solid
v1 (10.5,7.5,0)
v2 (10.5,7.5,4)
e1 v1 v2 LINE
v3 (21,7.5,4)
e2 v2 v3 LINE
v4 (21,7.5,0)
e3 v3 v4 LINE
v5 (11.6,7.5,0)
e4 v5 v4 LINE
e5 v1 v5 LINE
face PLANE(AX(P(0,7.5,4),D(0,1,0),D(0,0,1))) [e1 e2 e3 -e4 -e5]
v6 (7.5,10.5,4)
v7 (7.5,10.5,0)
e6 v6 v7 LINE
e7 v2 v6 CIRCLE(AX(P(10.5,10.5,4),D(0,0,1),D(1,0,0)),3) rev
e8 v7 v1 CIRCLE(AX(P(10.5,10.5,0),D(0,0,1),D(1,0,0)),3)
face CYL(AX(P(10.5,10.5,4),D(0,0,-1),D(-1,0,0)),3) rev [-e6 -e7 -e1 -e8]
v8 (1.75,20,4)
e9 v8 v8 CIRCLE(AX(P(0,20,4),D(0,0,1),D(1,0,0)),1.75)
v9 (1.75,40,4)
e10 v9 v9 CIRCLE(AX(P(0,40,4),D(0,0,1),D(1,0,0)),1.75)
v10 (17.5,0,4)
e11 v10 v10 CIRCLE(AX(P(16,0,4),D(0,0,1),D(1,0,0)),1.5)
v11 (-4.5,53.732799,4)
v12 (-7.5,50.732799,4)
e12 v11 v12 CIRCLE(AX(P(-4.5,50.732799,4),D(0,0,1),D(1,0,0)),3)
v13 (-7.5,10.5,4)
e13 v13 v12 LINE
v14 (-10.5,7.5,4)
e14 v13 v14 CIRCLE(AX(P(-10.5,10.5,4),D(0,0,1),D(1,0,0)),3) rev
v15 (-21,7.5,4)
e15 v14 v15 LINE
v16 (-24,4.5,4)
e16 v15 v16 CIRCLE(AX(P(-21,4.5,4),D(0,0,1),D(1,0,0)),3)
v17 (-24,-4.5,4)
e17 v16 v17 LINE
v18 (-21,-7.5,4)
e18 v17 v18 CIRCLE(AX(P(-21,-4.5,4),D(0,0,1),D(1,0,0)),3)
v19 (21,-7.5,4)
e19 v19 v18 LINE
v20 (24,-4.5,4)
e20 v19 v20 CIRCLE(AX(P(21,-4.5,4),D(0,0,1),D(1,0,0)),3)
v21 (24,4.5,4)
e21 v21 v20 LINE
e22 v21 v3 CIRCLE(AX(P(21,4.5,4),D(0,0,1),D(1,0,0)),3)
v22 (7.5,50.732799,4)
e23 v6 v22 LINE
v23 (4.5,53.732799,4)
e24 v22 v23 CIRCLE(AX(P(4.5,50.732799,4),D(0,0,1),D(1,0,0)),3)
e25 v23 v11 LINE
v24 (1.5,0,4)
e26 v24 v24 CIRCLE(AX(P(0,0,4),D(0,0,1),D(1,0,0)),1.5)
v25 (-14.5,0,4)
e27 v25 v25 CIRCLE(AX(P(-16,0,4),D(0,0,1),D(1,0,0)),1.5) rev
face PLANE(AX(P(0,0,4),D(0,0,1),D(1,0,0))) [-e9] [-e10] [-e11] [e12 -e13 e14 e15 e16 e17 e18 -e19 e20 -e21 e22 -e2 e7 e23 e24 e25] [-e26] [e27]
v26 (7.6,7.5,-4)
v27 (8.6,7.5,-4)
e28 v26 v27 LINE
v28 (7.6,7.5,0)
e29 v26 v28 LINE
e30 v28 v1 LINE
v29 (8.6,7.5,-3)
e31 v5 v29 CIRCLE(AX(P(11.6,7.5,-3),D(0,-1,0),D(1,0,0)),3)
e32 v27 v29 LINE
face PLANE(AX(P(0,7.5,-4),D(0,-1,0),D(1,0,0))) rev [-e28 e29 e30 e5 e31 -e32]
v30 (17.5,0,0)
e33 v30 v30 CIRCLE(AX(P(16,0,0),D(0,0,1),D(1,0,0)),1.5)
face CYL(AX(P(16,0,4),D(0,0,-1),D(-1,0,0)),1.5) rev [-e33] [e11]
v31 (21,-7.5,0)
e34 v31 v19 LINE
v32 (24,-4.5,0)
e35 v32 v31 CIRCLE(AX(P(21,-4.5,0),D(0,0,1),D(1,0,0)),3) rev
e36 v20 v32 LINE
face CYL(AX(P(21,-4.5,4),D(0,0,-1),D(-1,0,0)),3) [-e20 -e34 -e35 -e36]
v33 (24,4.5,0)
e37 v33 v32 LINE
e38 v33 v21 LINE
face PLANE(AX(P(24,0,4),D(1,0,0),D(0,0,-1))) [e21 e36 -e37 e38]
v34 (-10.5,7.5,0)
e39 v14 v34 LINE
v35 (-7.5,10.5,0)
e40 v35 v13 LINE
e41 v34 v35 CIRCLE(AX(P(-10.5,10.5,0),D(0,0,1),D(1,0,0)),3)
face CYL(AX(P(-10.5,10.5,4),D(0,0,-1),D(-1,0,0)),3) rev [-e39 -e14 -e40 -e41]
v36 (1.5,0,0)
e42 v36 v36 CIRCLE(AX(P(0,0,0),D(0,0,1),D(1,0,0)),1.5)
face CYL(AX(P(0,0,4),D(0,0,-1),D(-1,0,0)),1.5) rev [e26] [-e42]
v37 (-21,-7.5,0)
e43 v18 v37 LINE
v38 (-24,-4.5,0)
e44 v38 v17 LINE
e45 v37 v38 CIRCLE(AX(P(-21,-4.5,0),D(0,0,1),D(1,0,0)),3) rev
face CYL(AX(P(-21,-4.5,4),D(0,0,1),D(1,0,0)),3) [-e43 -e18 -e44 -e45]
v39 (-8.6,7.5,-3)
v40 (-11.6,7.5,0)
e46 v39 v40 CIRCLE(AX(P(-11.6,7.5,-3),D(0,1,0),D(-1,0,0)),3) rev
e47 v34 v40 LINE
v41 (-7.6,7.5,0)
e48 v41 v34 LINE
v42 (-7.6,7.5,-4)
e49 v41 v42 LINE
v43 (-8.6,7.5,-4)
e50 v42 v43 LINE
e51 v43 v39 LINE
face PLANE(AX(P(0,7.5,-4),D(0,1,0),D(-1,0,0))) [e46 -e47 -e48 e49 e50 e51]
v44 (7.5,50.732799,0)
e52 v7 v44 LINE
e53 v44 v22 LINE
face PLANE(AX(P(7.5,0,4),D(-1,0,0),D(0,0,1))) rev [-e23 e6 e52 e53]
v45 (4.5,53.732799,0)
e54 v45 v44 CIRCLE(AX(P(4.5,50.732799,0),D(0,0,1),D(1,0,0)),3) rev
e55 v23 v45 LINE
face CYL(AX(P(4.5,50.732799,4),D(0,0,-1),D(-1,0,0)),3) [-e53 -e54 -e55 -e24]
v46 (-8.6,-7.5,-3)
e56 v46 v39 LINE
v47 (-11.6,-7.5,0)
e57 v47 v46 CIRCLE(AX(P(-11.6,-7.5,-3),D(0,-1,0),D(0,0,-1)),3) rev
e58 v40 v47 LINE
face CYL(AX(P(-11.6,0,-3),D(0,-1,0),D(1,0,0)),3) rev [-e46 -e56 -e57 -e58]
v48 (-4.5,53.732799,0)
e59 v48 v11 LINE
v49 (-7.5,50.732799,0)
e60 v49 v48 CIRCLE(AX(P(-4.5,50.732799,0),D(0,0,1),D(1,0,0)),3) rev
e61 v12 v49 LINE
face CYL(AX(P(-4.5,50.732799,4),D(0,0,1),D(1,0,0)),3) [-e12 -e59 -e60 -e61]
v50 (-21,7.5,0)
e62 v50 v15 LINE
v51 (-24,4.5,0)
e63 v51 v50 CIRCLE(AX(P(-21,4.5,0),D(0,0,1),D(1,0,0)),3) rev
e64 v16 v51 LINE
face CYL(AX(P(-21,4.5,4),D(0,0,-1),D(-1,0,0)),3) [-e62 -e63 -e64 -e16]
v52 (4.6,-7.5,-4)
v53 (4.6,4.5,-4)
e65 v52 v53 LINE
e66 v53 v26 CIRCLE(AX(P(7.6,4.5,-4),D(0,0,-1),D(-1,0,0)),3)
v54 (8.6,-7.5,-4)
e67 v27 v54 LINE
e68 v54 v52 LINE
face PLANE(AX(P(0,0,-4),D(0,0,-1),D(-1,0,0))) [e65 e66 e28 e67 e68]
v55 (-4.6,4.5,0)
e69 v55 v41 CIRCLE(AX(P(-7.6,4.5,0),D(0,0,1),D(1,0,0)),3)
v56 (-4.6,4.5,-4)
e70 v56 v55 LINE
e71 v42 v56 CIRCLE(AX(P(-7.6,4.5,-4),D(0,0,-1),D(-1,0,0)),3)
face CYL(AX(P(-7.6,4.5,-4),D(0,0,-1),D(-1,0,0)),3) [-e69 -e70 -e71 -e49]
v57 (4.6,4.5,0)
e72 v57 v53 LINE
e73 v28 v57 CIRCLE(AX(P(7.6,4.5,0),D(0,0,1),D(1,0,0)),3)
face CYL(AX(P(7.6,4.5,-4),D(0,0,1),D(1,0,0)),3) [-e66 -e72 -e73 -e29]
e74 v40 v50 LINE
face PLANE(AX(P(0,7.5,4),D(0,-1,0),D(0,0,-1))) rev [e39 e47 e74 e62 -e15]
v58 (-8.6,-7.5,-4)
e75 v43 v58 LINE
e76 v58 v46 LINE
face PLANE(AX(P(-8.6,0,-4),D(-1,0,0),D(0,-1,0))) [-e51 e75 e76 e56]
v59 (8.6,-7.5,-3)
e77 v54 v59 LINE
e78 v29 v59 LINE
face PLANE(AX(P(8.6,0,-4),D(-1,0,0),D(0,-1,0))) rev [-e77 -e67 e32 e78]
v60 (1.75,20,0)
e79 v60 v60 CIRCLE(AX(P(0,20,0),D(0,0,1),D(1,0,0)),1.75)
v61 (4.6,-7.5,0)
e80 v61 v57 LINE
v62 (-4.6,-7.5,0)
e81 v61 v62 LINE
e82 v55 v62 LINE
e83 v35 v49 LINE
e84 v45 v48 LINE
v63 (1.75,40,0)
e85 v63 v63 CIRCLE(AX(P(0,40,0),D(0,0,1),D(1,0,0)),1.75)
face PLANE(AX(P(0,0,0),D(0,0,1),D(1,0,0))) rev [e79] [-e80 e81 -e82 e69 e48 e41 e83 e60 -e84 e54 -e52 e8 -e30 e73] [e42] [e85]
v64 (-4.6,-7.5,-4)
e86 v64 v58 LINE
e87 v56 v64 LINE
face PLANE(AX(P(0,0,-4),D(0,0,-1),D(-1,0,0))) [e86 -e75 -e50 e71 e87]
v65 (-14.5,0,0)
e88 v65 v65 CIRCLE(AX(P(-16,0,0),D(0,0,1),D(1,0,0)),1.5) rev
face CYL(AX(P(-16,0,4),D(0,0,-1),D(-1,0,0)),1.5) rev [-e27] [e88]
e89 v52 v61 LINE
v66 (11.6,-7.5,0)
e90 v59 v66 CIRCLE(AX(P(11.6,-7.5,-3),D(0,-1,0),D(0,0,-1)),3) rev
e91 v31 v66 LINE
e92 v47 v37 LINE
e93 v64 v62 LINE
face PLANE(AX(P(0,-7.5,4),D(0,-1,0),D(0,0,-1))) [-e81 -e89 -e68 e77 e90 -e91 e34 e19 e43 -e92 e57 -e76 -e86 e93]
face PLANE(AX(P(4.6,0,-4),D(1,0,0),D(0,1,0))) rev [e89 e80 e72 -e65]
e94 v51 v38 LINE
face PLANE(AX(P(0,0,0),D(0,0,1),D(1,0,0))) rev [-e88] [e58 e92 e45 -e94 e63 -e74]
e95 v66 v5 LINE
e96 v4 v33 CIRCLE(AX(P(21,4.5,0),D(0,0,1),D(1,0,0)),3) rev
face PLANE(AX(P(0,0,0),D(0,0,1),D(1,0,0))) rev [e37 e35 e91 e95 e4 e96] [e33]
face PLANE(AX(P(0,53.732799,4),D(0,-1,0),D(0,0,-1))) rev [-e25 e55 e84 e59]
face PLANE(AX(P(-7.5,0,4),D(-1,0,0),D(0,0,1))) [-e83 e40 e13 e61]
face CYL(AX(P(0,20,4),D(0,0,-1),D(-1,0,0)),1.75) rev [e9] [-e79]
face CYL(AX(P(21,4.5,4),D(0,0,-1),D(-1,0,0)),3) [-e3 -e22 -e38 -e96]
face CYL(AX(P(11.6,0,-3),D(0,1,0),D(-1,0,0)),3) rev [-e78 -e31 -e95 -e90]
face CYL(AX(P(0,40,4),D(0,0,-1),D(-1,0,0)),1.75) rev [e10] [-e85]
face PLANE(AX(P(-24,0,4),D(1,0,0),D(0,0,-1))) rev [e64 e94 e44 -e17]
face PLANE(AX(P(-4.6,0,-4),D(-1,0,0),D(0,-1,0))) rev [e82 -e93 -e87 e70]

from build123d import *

# Parameters (mm, degrees)
SKETCH_1_R      = 1.75
SKETCH_1_R_2    = 1.5
EXTRUDE_1_DEPTH = 4
FILLET_1_R      = 3
EXTRUDE_2_DEPTH = 4
FILLET_2_R      = 3
FILLET_3_R      = 3


with BuildPart() as part:
    # 草图1 → 凸台-拉伸1 (new body)
    with BuildSketch(Plane.XY):
        Polygon((-7.5, 7.5), (-7.5, 53.732798972), (7.5, 53.732798972), (7.5, 7.5), (24, 7.5), (24, -7.5), (-24, -7.5), (-24, 7.5), align=None)
        with Locations((0, 40)):
            Circle(SKETCH_1_R, mode=Mode.SUBTRACT)
        with Locations((0, 20)):
            Circle(SKETCH_1_R, mode=Mode.SUBTRACT)
        with Locations((16, 0)):
            Circle(SKETCH_1_R_2, mode=Mode.SUBTRACT)
        Circle(SKETCH_1_R_2, mode=Mode.SUBTRACT)
        with Locations((-16, 0)):
            Circle(SKETCH_1_R_2, mode=Mode.SUBTRACT)
    extrude(amount=EXTRUDE_1_DEPTH)

    # 圆角1
    fillet_1_edges = [part.edges().sort_by_distance(p)[0] for p in [
        (-7.5, 53.732798972, 2),
        (7.5, 53.732798972, 2),
        (7.5, 7.5, 2),
        (24, 7.5, 2),
        (24, -7.5, 2),
        (-24, -7.5, 2),
        (-24, 7.5, 2),
        (-7.5, 7.5, 2),
    ]]
    fillet(fillet_1_edges, radius=FILLET_1_R)

    # 草图2 → 凸台-拉伸2 (add)
    with BuildSketch(Plane(origin=(0, 0, 0), x_dir=(-1, 0, 0), z_dir=(0, 0, -1))):
        Polygon((4.6, -4.836204333), (4.6, -7.5), (8.6, -7.5), (8.6, 7.5), (4.6, 7.5), align=None)
        Polygon((-4.6, -4.836204333), (-4.6, 7.5), (-8.6, 7.5), (-8.6, -7.5), (-4.6, -7.5), align=None)
    extrude(amount=EXTRUDE_2_DEPTH)

    # 圆角2
    # the kernel refuses this fillet: 3 mm, written as the material it adds along each edge
    with BuildSketch(Plane(origin=(-8.6, -7.5, 0), x_dir=(-1, 0, 0), z_dir=(0, 1, 0)), Plane(origin=(8.6, 7.5, 0), x_dir=(1, 0, 0), z_dir=(0, -1, 0))) as fillet_2_piece_1:
        with BuildLine():
            CenterArc((FILLET_2_R, -FILLET_2_R), FILLET_2_R, 90, 90)
            Line((0, -FILLET_2_R), (0, 0))
            Line((0, 0), (FILLET_2_R, 0))
        make_face()
    extrude(amount=15)

    # 圆角3
    fillet_3_edges = [part.edges().sort_by_distance(p)[0] for p in [
        (-4.6, 7.5, -2),
        (4.6, 7.5, -2),
    ]]
    fillet(fillet_3_edges, radius=FILLET_3_R)


solid = part.part
